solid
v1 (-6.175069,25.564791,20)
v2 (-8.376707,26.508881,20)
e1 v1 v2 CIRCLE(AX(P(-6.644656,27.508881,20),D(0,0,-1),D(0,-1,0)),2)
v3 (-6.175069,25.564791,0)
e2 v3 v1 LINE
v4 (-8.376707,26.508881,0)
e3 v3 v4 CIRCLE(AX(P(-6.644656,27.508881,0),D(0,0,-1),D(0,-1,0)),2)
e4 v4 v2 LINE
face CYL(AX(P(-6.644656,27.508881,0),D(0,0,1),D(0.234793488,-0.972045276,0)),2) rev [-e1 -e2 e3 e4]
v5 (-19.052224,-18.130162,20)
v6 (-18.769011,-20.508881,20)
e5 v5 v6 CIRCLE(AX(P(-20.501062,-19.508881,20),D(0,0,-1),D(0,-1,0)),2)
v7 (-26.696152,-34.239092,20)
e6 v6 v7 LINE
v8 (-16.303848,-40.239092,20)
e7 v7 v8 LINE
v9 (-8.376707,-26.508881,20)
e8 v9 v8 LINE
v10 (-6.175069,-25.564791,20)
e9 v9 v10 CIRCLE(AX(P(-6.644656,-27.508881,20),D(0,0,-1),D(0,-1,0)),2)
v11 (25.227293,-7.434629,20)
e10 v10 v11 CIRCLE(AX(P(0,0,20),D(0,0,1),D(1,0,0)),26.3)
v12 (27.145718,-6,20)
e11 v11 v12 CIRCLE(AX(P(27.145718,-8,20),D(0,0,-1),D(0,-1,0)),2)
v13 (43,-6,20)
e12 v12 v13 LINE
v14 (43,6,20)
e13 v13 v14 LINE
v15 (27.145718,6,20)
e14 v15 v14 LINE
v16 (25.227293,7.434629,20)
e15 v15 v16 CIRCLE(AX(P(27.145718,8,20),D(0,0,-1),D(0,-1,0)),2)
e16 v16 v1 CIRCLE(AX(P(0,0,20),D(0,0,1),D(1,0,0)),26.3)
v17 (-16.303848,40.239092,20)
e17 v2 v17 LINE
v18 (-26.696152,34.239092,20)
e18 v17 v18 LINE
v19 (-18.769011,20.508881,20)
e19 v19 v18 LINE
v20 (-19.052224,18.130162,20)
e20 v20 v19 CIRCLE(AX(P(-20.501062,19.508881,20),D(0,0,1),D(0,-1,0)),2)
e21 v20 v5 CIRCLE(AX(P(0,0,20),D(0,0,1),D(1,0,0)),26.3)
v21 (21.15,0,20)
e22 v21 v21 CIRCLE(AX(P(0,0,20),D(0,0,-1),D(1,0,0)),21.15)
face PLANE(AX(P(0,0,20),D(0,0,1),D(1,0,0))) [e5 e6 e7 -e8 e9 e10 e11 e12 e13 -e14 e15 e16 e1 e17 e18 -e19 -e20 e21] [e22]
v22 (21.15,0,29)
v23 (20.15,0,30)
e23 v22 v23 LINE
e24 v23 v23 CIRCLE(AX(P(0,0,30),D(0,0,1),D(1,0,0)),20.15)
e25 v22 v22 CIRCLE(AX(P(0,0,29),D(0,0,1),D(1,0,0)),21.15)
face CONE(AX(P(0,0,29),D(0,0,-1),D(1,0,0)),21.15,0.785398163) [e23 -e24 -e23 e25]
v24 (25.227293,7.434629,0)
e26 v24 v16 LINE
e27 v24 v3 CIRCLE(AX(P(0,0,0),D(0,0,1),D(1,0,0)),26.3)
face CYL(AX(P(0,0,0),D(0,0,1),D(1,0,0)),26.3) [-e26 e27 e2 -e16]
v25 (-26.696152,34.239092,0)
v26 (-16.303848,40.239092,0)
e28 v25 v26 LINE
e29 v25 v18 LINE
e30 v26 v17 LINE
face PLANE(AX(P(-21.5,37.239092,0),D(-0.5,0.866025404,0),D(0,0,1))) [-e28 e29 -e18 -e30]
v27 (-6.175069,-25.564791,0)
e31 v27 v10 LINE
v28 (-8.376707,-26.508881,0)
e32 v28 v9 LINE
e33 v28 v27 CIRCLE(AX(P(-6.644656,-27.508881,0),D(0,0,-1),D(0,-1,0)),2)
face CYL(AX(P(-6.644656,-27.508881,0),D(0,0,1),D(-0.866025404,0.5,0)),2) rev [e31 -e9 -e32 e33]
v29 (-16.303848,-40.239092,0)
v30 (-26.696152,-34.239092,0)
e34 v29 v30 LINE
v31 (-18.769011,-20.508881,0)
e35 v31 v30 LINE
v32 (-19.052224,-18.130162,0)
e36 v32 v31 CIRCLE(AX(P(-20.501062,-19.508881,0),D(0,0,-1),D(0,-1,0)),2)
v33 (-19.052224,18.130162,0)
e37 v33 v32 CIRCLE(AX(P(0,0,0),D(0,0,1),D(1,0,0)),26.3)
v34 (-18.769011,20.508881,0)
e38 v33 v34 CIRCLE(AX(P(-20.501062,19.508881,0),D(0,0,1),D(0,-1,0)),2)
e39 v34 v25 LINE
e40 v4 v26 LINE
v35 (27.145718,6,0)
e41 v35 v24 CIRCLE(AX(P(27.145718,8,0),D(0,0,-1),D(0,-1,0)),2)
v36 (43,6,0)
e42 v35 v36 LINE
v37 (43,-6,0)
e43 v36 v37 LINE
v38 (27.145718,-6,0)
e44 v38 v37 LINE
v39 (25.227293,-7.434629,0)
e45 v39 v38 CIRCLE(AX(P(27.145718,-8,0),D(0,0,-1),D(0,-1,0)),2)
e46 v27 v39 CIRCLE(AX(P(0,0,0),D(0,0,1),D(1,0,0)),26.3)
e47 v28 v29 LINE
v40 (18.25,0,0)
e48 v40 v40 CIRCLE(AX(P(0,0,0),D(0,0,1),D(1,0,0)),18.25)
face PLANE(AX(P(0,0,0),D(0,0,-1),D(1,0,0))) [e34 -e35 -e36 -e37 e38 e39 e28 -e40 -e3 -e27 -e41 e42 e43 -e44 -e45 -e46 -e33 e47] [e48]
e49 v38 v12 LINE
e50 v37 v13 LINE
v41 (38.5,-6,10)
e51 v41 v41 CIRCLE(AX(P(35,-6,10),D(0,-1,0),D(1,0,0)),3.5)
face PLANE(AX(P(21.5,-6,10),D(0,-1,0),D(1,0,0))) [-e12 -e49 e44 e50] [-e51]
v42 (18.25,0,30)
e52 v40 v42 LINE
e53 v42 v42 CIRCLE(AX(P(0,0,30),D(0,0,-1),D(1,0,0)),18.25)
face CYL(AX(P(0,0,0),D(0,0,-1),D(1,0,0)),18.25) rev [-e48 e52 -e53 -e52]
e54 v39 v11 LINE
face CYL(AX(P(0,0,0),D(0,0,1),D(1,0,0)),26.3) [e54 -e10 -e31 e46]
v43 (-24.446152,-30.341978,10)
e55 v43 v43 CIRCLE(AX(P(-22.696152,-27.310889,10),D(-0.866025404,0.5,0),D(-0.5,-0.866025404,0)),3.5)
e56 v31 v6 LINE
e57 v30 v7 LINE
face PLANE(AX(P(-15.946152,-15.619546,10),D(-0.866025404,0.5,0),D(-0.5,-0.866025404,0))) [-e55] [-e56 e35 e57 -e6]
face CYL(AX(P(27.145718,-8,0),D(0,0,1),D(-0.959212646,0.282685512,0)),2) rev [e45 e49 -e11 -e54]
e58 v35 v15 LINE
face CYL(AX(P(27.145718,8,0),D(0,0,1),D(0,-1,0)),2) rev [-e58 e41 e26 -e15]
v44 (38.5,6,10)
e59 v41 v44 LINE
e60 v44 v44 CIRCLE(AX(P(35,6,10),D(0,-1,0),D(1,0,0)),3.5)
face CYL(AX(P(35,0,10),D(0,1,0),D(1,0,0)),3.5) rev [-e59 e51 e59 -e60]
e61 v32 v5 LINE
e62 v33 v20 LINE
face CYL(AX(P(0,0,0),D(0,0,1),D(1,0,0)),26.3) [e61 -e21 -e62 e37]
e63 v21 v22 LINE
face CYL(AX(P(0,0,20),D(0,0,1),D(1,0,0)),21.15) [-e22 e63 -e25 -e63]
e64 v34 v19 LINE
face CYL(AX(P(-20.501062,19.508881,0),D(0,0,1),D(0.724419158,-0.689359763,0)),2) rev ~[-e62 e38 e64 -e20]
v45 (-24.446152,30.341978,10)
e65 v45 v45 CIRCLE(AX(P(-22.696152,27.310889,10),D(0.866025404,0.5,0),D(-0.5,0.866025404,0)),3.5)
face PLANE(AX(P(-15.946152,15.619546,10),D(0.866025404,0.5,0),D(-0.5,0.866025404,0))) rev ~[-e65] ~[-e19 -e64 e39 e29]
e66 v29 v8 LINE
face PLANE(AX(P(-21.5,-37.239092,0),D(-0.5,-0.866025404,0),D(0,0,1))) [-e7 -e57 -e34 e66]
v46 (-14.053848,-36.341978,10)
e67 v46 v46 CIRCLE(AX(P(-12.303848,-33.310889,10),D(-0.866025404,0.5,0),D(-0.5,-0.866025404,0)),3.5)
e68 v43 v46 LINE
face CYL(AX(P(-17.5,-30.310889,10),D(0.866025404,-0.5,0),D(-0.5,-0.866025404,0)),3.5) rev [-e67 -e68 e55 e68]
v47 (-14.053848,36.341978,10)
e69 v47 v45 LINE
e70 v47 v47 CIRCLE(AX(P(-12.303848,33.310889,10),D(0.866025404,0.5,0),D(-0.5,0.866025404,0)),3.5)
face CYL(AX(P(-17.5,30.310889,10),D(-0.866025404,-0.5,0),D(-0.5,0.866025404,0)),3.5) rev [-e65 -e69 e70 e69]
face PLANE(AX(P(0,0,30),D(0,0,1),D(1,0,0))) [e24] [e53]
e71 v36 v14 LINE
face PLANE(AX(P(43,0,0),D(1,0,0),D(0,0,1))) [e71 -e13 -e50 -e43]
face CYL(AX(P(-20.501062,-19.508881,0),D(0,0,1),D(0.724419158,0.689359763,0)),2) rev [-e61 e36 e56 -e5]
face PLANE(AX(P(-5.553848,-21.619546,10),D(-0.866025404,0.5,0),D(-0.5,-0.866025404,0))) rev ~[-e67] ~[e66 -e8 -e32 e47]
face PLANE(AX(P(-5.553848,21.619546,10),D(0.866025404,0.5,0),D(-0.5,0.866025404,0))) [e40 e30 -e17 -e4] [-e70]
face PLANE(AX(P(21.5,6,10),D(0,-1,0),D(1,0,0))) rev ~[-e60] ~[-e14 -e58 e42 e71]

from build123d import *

# Parameters (mm, degrees)
F2_W            = 43
F2_H            = 20
F2_R            = 3.5
F3_DEPTH        = 6
F3_COPIES_COUNT = 3
F4_R            = 18.25
F5_DEPTH        = 30.001
F6_SIZE         = 1
F7_R            = 2


# Not quite as in the source:
# - a pattern or mirror of a feature is missing from the dataset's text; its kind, count and spacing are read off the source's solid


with BuildPart() as f1:
    # F0 (on Front) → F1 (revolve)
    with BuildSketch(Plane.XZ):
        Polygon((21.15, 30), (0, 30), (0, 0), (26.3, 0), (26.3, 20), (21.15, 20), align=None)
    revolve(axis=Axis((0, 0, 22.5), (0, 0, 1)))

    # F2 (on Front) → F3 (join, symmetric)
    with BuildSketch(Plane.XZ):
        with Locations((21.5, 10)):
            Rectangle(F2_W, F2_H)
        with Locations((35, 10)):
            Circle(F2_R, mode=Mode.SUBTRACT)
    f3 = extrude(amount=F3_DEPTH, both=True)

    # F3_copies: F3 ×3 about axis
    f3_copies_axis = Axis((0, 0, 0), (0, 0, 1))
    for i in range(1, F3_COPIES_COUNT):
        add(f3.rotate(f3_copies_axis, i * 360 / F3_COPIES_COUNT))

    # F4 (on Top) → F5 (cut, through all)
    with BuildSketch(Plane.XY):
        Circle(F4_R)
    extrude(amount=F5_DEPTH, mode=Mode.SUBTRACT)

    # F6
    f6_edges = [f1.edges().sort_by_distance(p)[0] for p in [
        (-21.15, 0, 30),
    ]]
    chamfer(f6_edges, length=F6_SIZE)

    # F7
    f7_edges = [f1.edges().sort_by_distance(p)[0] for p in [
        (25.606445, -6, 10),
        (25.606445, 6, 10),
        (-7.60707, 25.175831, 10),
        (-17.999375, 19.175831, 10),
        (-7.60707, -25.175831, 10),
        (-17.999375, -19.175831, 10),
    ]]
    fillet(f7_edges, radius=F7_R)


solid = f1.part
